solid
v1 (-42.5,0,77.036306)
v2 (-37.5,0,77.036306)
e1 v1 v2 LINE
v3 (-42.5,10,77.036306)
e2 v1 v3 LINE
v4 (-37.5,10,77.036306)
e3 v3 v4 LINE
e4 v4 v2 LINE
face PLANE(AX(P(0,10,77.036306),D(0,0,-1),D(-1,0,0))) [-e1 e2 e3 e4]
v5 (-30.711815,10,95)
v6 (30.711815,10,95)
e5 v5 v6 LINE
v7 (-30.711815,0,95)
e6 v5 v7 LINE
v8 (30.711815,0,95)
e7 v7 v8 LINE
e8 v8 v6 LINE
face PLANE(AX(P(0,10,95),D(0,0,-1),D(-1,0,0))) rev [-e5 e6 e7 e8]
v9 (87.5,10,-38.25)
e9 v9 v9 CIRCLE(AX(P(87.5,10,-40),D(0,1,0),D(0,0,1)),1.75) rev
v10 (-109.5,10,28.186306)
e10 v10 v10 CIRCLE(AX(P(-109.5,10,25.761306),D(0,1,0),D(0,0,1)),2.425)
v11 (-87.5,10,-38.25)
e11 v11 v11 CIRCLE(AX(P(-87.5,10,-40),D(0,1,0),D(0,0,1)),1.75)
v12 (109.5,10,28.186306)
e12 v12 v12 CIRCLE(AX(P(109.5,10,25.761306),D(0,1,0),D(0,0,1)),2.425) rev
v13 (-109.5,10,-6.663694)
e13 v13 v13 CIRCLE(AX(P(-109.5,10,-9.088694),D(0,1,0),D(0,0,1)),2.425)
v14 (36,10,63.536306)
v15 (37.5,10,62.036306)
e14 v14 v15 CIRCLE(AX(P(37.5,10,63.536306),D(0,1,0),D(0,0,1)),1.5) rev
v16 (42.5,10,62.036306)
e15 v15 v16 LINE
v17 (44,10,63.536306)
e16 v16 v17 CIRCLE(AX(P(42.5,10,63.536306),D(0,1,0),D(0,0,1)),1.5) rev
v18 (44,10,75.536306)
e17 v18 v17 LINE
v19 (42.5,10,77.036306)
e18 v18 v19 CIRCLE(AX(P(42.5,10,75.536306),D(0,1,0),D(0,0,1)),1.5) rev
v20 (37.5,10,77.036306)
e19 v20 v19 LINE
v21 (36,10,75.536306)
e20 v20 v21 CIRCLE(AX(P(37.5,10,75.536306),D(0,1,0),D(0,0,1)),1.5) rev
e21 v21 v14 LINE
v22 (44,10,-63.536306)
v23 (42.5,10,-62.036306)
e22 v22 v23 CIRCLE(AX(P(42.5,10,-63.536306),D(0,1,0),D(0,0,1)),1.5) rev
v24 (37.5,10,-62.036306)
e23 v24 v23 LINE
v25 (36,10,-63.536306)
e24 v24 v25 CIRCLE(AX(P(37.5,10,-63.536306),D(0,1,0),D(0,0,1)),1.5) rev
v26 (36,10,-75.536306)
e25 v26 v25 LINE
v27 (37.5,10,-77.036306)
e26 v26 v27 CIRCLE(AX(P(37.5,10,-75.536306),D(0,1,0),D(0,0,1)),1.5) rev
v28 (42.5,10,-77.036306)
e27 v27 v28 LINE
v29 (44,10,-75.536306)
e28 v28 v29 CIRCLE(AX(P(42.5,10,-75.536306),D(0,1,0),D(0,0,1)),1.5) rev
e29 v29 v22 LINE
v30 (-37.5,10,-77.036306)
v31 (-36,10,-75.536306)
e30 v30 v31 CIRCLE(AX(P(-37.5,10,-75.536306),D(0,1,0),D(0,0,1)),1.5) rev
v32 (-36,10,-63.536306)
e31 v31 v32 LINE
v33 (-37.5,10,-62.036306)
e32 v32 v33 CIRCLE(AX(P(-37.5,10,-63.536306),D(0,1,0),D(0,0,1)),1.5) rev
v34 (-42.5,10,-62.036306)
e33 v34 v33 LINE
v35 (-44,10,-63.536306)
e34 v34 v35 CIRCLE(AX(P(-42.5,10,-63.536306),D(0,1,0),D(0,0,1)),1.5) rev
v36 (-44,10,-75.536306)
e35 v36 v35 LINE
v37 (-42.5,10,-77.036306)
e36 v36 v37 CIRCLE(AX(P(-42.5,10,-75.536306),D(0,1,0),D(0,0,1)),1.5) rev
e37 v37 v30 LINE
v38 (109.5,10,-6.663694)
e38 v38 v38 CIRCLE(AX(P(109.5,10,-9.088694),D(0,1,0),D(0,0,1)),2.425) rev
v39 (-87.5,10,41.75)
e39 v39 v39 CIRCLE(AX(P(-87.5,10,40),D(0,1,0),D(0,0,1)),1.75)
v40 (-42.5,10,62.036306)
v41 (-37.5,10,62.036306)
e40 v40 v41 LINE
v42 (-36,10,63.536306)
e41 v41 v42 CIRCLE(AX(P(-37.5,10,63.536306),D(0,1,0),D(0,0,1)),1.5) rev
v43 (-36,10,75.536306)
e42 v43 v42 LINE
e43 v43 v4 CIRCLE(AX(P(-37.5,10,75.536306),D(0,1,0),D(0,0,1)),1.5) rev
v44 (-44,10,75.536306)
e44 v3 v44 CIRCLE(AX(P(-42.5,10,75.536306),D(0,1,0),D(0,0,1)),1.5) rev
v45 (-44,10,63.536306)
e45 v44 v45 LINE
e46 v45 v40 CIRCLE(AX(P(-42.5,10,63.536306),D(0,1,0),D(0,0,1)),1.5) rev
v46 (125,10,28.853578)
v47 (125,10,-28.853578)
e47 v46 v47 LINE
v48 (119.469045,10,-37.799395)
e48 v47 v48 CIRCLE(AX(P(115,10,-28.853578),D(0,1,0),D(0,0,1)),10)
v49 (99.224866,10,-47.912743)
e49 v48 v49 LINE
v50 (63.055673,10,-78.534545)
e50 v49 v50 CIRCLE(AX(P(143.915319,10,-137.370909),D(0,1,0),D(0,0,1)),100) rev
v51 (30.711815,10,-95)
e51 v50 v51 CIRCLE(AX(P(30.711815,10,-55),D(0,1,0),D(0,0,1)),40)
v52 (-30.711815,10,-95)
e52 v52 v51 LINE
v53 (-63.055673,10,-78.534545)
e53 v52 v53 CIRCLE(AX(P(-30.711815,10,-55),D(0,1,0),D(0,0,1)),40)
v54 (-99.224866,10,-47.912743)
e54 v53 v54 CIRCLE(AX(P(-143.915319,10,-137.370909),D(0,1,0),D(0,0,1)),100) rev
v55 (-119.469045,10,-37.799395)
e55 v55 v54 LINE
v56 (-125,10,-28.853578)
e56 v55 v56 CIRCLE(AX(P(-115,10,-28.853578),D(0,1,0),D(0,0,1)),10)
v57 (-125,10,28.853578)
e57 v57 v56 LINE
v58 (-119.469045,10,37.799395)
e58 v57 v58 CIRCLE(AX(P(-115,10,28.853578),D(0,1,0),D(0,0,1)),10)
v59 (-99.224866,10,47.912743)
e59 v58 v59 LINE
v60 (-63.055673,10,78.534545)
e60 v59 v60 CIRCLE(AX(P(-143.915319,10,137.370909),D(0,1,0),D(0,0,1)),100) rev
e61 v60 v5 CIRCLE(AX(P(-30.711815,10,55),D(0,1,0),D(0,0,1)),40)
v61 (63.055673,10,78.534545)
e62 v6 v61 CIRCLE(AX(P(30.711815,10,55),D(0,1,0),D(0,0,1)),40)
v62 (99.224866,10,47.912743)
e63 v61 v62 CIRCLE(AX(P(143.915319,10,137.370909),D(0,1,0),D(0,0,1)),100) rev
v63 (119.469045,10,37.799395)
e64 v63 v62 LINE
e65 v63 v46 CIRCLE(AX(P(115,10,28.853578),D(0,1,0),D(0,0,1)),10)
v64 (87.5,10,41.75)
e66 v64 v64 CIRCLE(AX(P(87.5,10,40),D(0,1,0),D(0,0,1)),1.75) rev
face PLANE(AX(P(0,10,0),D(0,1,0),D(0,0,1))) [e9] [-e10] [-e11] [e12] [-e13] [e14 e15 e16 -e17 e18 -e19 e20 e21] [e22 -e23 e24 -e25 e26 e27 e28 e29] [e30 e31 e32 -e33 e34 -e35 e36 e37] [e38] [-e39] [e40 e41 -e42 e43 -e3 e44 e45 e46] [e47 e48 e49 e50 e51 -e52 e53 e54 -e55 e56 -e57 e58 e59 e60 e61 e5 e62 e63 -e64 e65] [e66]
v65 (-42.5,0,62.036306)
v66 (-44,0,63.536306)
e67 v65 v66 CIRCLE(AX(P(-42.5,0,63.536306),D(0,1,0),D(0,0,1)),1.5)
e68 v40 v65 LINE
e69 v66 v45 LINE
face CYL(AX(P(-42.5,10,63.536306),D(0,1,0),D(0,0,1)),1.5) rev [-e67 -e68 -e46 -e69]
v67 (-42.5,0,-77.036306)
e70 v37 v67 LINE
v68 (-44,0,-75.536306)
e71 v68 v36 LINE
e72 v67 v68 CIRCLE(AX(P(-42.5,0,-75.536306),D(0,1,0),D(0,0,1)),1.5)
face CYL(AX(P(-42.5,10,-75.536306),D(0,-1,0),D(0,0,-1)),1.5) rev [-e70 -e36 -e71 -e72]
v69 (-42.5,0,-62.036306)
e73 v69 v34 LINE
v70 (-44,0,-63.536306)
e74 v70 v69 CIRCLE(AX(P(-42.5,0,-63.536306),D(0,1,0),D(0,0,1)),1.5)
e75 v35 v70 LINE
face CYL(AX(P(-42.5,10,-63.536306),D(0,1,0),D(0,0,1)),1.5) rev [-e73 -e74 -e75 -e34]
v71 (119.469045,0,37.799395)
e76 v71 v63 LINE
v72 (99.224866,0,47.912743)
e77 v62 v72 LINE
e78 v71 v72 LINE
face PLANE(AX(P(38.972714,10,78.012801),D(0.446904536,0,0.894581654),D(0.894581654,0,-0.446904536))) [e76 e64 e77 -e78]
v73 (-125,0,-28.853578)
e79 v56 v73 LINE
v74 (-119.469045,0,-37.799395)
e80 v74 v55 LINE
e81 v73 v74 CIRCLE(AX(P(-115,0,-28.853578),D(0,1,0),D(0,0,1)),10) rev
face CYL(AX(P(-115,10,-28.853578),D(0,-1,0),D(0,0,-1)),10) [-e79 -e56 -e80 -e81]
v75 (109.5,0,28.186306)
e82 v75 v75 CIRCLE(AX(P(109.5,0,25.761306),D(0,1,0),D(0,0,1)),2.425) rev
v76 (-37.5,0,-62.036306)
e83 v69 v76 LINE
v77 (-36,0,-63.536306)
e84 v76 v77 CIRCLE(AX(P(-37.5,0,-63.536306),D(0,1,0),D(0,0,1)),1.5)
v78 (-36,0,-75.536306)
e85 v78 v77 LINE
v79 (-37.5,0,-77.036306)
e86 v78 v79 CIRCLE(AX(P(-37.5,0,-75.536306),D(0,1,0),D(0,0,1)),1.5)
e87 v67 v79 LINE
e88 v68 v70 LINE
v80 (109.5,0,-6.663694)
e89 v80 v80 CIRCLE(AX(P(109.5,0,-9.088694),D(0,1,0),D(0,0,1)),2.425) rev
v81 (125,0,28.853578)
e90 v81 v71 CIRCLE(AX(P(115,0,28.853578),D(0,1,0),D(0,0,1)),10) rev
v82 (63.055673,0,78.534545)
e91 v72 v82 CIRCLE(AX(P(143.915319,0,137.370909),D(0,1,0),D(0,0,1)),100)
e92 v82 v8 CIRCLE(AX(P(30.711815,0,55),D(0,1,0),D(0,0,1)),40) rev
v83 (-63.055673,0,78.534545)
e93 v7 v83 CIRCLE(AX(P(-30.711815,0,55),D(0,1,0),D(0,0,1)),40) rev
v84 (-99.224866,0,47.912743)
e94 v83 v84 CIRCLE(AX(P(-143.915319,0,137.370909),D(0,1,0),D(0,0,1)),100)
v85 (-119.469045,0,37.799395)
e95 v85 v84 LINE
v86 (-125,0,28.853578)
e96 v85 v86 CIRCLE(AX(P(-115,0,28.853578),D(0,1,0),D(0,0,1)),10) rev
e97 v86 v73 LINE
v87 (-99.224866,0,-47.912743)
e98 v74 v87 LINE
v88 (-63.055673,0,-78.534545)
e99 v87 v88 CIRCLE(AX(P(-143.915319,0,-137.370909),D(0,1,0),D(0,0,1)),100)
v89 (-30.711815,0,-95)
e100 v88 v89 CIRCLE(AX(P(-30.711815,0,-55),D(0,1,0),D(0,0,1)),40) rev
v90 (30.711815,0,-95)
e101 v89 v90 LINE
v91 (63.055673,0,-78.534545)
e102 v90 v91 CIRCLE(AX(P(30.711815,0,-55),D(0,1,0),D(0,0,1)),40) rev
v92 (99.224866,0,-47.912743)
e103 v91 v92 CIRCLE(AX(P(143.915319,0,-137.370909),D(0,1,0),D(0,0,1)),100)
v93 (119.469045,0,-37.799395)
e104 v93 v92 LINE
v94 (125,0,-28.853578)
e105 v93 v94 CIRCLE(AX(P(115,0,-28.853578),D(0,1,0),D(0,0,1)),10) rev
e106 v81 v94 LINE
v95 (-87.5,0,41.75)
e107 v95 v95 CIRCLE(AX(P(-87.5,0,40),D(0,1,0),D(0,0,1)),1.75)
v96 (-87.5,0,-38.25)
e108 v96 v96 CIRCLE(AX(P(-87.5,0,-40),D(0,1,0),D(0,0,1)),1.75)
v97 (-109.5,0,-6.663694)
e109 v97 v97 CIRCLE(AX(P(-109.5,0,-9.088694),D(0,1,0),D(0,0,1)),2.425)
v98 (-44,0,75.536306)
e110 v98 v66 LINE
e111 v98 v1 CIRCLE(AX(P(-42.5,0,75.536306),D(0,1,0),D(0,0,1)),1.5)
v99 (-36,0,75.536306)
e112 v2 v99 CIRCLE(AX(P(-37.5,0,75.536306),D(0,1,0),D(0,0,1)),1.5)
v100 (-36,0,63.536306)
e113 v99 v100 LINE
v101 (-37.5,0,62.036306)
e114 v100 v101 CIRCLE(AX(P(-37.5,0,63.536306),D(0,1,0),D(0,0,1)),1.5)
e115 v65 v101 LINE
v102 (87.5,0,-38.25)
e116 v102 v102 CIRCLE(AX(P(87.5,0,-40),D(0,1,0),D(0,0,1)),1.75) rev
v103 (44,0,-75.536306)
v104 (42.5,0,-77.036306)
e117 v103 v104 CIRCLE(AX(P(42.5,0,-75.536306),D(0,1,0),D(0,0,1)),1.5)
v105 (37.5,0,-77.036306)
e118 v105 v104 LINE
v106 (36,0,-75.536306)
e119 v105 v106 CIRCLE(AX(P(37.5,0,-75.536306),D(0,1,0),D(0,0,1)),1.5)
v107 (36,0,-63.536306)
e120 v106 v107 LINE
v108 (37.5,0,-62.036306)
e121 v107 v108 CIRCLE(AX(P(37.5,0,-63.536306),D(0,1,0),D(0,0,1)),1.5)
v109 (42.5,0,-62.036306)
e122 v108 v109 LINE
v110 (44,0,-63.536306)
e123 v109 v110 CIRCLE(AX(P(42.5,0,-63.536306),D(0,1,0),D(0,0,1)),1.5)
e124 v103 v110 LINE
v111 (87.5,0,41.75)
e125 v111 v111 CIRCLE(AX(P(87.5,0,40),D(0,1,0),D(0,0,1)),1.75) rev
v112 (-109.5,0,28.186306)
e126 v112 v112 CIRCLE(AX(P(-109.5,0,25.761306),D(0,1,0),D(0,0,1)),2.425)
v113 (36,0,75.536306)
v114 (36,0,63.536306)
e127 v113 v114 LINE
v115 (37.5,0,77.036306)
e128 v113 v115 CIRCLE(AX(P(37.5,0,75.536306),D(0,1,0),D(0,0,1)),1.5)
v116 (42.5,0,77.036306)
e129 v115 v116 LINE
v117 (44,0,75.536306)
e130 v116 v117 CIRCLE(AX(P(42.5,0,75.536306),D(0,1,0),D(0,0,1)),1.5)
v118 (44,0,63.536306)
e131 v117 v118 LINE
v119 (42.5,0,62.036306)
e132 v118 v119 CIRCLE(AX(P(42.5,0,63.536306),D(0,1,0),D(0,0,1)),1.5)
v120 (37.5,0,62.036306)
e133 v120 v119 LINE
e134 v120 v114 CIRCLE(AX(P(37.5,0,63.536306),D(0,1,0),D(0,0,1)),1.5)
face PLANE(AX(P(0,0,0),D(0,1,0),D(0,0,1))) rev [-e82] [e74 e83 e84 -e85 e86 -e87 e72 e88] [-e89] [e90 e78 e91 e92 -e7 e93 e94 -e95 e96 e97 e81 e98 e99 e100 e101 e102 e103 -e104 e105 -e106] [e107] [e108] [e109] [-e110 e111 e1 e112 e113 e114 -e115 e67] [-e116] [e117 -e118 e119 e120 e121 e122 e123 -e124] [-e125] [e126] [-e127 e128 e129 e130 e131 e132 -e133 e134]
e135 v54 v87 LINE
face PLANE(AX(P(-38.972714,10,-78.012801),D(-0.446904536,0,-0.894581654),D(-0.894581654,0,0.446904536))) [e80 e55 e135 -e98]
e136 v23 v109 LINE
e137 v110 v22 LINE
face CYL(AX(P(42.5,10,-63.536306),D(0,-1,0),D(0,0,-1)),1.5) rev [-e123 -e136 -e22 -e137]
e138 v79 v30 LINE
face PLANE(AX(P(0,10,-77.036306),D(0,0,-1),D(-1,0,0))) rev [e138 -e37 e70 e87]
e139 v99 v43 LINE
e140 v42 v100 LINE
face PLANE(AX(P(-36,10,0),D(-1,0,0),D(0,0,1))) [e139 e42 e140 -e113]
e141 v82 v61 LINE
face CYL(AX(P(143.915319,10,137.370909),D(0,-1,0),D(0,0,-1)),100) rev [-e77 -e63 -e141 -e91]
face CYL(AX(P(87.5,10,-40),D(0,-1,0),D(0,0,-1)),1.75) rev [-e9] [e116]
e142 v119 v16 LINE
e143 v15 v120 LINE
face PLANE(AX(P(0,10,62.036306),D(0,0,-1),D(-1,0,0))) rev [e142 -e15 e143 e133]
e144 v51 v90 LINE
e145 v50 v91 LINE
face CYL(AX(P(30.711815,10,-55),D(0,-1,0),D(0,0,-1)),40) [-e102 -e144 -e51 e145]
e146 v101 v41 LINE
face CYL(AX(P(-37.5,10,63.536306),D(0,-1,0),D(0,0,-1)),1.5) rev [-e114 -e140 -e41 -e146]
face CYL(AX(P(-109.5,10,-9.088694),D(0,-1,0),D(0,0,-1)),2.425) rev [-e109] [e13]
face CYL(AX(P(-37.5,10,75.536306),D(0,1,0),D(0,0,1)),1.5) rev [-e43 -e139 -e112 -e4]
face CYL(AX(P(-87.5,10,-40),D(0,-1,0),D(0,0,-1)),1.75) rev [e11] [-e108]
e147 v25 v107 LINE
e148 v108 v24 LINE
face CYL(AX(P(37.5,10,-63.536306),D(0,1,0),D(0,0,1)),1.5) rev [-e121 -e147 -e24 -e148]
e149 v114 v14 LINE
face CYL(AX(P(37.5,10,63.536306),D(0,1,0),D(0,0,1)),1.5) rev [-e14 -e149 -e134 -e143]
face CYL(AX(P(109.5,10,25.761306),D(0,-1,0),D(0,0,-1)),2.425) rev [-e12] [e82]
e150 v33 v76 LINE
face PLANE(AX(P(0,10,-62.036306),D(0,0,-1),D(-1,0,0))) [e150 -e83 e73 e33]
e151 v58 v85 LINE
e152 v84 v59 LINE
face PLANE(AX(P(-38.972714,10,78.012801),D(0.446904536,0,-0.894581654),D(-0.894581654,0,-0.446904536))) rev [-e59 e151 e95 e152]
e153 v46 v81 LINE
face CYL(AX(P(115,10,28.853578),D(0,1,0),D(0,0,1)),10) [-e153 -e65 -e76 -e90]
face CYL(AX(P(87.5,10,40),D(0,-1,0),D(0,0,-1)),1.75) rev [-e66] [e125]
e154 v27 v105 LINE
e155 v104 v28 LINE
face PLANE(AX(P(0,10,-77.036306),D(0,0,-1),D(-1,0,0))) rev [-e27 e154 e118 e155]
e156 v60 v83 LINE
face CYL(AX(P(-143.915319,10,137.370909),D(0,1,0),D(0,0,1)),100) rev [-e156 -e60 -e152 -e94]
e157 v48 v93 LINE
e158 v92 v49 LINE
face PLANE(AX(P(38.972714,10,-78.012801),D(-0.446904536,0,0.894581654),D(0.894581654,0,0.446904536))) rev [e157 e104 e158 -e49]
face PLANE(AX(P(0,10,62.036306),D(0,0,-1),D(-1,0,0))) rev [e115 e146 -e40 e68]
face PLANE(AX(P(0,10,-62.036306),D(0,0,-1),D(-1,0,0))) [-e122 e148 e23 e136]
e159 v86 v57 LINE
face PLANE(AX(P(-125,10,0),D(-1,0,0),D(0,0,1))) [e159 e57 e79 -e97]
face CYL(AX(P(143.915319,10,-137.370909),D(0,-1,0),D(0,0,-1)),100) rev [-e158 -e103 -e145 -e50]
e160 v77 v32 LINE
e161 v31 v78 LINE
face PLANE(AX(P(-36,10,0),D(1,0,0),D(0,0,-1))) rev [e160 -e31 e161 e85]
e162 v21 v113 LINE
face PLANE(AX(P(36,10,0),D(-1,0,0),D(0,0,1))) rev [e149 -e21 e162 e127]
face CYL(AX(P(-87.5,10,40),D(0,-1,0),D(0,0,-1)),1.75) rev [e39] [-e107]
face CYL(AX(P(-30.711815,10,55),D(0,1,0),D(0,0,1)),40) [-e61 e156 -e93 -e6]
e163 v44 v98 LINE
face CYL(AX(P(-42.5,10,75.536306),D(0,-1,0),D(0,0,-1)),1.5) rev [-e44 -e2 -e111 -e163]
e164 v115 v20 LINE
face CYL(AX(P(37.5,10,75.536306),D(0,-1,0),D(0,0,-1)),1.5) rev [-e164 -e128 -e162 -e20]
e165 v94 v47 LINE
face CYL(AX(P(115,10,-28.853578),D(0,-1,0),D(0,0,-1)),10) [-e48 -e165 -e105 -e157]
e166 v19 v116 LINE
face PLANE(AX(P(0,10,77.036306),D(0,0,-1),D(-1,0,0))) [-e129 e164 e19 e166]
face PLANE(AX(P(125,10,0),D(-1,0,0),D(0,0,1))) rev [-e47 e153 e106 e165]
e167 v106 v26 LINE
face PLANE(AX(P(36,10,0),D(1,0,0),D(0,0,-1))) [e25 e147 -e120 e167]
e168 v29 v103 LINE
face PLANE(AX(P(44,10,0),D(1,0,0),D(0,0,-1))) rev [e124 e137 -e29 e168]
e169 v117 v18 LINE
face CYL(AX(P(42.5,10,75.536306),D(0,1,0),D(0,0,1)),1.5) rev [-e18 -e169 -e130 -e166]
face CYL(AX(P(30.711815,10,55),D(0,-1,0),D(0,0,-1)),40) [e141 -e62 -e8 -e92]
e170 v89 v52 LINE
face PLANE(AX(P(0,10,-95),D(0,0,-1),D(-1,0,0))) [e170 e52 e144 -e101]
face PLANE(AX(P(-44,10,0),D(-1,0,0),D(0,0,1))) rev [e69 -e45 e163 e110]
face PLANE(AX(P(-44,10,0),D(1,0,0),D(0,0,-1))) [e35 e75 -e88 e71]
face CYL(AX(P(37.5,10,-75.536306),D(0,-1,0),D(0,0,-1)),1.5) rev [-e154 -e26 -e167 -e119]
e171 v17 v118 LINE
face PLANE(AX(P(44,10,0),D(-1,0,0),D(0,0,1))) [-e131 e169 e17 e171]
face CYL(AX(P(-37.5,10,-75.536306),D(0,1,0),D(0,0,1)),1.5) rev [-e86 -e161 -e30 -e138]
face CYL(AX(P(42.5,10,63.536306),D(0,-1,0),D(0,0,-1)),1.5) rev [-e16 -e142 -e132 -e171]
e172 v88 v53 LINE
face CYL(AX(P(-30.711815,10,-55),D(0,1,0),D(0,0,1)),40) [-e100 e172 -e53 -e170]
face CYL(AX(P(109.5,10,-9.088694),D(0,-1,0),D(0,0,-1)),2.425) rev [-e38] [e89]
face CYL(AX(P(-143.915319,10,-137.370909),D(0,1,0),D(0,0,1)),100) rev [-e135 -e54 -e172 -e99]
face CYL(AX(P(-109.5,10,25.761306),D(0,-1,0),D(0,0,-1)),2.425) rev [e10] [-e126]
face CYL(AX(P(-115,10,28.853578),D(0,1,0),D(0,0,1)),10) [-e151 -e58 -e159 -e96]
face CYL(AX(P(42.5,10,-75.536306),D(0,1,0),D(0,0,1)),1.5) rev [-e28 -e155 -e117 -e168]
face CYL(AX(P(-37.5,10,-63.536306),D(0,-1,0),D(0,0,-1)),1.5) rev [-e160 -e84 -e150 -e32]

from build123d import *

# Parameters (mm, degrees)
SKETCH2_W           = 8
SKETCH2_H           = 15
SKETCH2_R           = 1.75
SKETCH2_R_2         = 2.425
BOSS_EXTRUDE1_DEPTH = 10
FILLET1_R           = 10
FILLET2_R           = 40
FILLET4_R           = 1.5
FILLET3_R           = 100


with BuildPart() as part:
    # Sketch2 → Boss-Extrude1 (new body)
    with BuildSketch(Plane(origin=(0, 0, 0), x_dir=(1, 0, 0), z_dir=(0, 1, 0))):
        Polygon((70, 95), (-70, 95), (-70, 62.51255638), (-125, 35.036306), (-125, -35.036306), (-70, -62.51255638), (-70, -95), (70, -95), (70, -62.51255638), (125, -35.036306), (125, 35.036306), (70, 62.51255638), align=None)
        with Locations((-40, -69.536306)):
            Rectangle(SKETCH2_W, SKETCH2_H, mode=Mode.SUBTRACT)
        with Locations(Location((-87.5, -40, 0), (0, 0, 270))):
            Circle(SKETCH2_R, mode=Mode.SUBTRACT)
        with Locations(Location((-109.5, -25.761306, 0), (0, 0, 270))):
            Circle(SKETCH2_R_2, mode=Mode.SUBTRACT)
        with Locations((40, -69.536306)):
            Rectangle(SKETCH2_W, SKETCH2_H, mode=Mode.SUBTRACT)
        with Locations(Location((87.5, -40, 0), (0, 0, 270))):
            Circle(SKETCH2_R, mode=Mode.SUBTRACT)
        with Locations(Location((109.5, -25.761306, 0), (0, 0, 270))):
            Circle(SKETCH2_R_2, mode=Mode.SUBTRACT)
        with Locations(Location((-109.5, 9.088694, 0), (0, 0, 270))):
            Circle(SKETCH2_R_2, mode=Mode.SUBTRACT)
        with Locations(Location((-87.5, 40, 0), (0, 0, 270))):
            Circle(SKETCH2_R, mode=Mode.SUBTRACT)
        with Locations((-40, 69.536306)):
            Rectangle(SKETCH2_W, SKETCH2_H, mode=Mode.SUBTRACT)
        with Locations(Location((109.5, 9.088694, 0), (0, 0, 270))):
            Circle(SKETCH2_R_2, mode=Mode.SUBTRACT)
        with Locations((40, 69.536306)):
            Rectangle(SKETCH2_W, SKETCH2_H, mode=Mode.SUBTRACT)
        with Locations(Location((87.5, 40, 0), (0, 0, 270))):
            Circle(SKETCH2_R, mode=Mode.SUBTRACT)
    extrude(amount=BOSS_EXTRUDE1_DEPTH)

    # Fillet1
    fillet1_edges = [part.edges().sort_by_distance(p)[0] for p in [
        (125, 5, 35.036306),
        (-125, 5, 35.036306),
        (-125, 5, -35.036306),
        (125, 5, -35.036306),
    ]]
    fillet(fillet1_edges, radius=FILLET1_R)

    # Fillet2
    # the kernel refuses this fillet: 40 mm, written as the material it takes off along each edge
    with BuildSketch(Plane(origin=(-70, -98.220463011, 95), x_dir=(0, 0, -1), z_dir=(0, 1, 0))) as fillet2_piece_1:
        with BuildLine():
            CenterArc((40, -39.288185204), FILLET2_R, 100.825233866, 79.174766134)
            Line((0, -39.288185204), (-0.8, -39.288185204))
            Line((-0.8, -39.288185204), (-0.8, 0))
            Line((-0.8, 0), (0, 0.8))
            ThreePointArc((0, 0.8), (16.24372181, 0.8), (32.337192493, 0.785763704))
            Line((32.337192493, 0.785763704), (32.48744362, 0))
        make_face()
    extrude(amount=206.440926021, mode=Mode.SUBTRACT)
    with BuildSketch(Plane(origin=(70, -98.220463011, 95), x_dir=(-1, 0, 0), z_dir=(0, 1, 0))) as fillet2_piece_2:
        with BuildLine():
            CenterArc((39.288185204, -40), FILLET2_R, 90, 79.174766134)
            Line((0, -32.48744362), (-0.785763704, -32.337192493))
            ThreePointArc((-0.785763704, -32.337192493), (-0.8, -16.24372181), (-0.8, 0))
            Line((-0.8, 0), (0, 0.8))
            Line((0, 0.8), (39.288185204, 0.8))
            Line((39.288185204, 0.8), (39.288185204, 0))
        make_face()
    extrude(amount=206.440926021, mode=Mode.SUBTRACT)
    with BuildSketch(Plane(origin=(70, -98.220463011, -95), x_dir=(-1, 0, 0), z_dir=(0, 1, 0))) as fillet2_piece_3:
        with BuildLine():
            CenterArc((39.288185204, 40), FILLET2_R, 190.825233866, 79.174766134)
            Line((0, 32.48744362), (-0.785763704, 32.337192493))
            ThreePointArc((-0.785763704, 32.337192493), (-0.8, 16.24372181), (-0.8, 0))
            Line((-0.8, 0), (0, -0.8))
            Line((0, -0.8), (39.288185204, -0.8))
            Line((39.288185204, -0.8), (39.288185204, 0))
        make_face()
    extrude(amount=206.440926021, mode=Mode.SUBTRACT)
    with BuildSketch(Plane(origin=(-70, -98.220463011, -95), x_dir=(0, 0, 1), z_dir=(0, 1, 0))) as fillet2_piece_4:
        with BuildLine():
            CenterArc((40, 39.288185204), FILLET2_R, 180, 79.174766134)
            Line((0, 39.288185204), (-0.8, 39.288185204))
            Line((-0.8, 39.288185204), (-0.8, 0))
            Line((-0.8, 0), (0, -0.8))
            ThreePointArc((0, -0.8), (16.24372181, -0.8), (32.337192493, -0.785763704))
            Line((32.337192493, -0.785763704), (32.48744362, 0))
        make_face()
    extrude(amount=206.440926021, mode=Mode.SUBTRACT)

    # Fillet4
    fillet4_edges = [part.edges().sort_by_distance(p)[0] for p in [
        (36, 5, 62.036306),
        (36, 5, 77.036306),
        (44, 5, 77.036306),
        (44, 5, 62.036306),
        (-36, 5, 62.036306),
        (-44, 5, 62.036306),
        (-44, 5, 77.036306),
        (-36, 5, 77.036306),
        (36, 5, -77.036306),
        (36, 5, -62.036306),
        (44, 5, -62.036306),
        (44, 5, -77.036306),
        (-44, 5, -77.036306),
        (-44, 5, -62.036306),
        (-36, 5, -62.036306),
        (-36, 5, -77.036306),
    ]]
    fillet(fillet4_edges, radius=FILLET4_R)

    # Fillet3
    fillet3_edges = [part.edges().sort_by_distance(p)[0] for p in [
        (70, 5, 62.51255638),
        (-70, 5, 62.51255638),
        (-70, 5, -62.51255638),
        (70, 5, -62.51255638),
    ]]
    fillet(fillet3_edges, radius=FILLET3_R)


solid = part.part
